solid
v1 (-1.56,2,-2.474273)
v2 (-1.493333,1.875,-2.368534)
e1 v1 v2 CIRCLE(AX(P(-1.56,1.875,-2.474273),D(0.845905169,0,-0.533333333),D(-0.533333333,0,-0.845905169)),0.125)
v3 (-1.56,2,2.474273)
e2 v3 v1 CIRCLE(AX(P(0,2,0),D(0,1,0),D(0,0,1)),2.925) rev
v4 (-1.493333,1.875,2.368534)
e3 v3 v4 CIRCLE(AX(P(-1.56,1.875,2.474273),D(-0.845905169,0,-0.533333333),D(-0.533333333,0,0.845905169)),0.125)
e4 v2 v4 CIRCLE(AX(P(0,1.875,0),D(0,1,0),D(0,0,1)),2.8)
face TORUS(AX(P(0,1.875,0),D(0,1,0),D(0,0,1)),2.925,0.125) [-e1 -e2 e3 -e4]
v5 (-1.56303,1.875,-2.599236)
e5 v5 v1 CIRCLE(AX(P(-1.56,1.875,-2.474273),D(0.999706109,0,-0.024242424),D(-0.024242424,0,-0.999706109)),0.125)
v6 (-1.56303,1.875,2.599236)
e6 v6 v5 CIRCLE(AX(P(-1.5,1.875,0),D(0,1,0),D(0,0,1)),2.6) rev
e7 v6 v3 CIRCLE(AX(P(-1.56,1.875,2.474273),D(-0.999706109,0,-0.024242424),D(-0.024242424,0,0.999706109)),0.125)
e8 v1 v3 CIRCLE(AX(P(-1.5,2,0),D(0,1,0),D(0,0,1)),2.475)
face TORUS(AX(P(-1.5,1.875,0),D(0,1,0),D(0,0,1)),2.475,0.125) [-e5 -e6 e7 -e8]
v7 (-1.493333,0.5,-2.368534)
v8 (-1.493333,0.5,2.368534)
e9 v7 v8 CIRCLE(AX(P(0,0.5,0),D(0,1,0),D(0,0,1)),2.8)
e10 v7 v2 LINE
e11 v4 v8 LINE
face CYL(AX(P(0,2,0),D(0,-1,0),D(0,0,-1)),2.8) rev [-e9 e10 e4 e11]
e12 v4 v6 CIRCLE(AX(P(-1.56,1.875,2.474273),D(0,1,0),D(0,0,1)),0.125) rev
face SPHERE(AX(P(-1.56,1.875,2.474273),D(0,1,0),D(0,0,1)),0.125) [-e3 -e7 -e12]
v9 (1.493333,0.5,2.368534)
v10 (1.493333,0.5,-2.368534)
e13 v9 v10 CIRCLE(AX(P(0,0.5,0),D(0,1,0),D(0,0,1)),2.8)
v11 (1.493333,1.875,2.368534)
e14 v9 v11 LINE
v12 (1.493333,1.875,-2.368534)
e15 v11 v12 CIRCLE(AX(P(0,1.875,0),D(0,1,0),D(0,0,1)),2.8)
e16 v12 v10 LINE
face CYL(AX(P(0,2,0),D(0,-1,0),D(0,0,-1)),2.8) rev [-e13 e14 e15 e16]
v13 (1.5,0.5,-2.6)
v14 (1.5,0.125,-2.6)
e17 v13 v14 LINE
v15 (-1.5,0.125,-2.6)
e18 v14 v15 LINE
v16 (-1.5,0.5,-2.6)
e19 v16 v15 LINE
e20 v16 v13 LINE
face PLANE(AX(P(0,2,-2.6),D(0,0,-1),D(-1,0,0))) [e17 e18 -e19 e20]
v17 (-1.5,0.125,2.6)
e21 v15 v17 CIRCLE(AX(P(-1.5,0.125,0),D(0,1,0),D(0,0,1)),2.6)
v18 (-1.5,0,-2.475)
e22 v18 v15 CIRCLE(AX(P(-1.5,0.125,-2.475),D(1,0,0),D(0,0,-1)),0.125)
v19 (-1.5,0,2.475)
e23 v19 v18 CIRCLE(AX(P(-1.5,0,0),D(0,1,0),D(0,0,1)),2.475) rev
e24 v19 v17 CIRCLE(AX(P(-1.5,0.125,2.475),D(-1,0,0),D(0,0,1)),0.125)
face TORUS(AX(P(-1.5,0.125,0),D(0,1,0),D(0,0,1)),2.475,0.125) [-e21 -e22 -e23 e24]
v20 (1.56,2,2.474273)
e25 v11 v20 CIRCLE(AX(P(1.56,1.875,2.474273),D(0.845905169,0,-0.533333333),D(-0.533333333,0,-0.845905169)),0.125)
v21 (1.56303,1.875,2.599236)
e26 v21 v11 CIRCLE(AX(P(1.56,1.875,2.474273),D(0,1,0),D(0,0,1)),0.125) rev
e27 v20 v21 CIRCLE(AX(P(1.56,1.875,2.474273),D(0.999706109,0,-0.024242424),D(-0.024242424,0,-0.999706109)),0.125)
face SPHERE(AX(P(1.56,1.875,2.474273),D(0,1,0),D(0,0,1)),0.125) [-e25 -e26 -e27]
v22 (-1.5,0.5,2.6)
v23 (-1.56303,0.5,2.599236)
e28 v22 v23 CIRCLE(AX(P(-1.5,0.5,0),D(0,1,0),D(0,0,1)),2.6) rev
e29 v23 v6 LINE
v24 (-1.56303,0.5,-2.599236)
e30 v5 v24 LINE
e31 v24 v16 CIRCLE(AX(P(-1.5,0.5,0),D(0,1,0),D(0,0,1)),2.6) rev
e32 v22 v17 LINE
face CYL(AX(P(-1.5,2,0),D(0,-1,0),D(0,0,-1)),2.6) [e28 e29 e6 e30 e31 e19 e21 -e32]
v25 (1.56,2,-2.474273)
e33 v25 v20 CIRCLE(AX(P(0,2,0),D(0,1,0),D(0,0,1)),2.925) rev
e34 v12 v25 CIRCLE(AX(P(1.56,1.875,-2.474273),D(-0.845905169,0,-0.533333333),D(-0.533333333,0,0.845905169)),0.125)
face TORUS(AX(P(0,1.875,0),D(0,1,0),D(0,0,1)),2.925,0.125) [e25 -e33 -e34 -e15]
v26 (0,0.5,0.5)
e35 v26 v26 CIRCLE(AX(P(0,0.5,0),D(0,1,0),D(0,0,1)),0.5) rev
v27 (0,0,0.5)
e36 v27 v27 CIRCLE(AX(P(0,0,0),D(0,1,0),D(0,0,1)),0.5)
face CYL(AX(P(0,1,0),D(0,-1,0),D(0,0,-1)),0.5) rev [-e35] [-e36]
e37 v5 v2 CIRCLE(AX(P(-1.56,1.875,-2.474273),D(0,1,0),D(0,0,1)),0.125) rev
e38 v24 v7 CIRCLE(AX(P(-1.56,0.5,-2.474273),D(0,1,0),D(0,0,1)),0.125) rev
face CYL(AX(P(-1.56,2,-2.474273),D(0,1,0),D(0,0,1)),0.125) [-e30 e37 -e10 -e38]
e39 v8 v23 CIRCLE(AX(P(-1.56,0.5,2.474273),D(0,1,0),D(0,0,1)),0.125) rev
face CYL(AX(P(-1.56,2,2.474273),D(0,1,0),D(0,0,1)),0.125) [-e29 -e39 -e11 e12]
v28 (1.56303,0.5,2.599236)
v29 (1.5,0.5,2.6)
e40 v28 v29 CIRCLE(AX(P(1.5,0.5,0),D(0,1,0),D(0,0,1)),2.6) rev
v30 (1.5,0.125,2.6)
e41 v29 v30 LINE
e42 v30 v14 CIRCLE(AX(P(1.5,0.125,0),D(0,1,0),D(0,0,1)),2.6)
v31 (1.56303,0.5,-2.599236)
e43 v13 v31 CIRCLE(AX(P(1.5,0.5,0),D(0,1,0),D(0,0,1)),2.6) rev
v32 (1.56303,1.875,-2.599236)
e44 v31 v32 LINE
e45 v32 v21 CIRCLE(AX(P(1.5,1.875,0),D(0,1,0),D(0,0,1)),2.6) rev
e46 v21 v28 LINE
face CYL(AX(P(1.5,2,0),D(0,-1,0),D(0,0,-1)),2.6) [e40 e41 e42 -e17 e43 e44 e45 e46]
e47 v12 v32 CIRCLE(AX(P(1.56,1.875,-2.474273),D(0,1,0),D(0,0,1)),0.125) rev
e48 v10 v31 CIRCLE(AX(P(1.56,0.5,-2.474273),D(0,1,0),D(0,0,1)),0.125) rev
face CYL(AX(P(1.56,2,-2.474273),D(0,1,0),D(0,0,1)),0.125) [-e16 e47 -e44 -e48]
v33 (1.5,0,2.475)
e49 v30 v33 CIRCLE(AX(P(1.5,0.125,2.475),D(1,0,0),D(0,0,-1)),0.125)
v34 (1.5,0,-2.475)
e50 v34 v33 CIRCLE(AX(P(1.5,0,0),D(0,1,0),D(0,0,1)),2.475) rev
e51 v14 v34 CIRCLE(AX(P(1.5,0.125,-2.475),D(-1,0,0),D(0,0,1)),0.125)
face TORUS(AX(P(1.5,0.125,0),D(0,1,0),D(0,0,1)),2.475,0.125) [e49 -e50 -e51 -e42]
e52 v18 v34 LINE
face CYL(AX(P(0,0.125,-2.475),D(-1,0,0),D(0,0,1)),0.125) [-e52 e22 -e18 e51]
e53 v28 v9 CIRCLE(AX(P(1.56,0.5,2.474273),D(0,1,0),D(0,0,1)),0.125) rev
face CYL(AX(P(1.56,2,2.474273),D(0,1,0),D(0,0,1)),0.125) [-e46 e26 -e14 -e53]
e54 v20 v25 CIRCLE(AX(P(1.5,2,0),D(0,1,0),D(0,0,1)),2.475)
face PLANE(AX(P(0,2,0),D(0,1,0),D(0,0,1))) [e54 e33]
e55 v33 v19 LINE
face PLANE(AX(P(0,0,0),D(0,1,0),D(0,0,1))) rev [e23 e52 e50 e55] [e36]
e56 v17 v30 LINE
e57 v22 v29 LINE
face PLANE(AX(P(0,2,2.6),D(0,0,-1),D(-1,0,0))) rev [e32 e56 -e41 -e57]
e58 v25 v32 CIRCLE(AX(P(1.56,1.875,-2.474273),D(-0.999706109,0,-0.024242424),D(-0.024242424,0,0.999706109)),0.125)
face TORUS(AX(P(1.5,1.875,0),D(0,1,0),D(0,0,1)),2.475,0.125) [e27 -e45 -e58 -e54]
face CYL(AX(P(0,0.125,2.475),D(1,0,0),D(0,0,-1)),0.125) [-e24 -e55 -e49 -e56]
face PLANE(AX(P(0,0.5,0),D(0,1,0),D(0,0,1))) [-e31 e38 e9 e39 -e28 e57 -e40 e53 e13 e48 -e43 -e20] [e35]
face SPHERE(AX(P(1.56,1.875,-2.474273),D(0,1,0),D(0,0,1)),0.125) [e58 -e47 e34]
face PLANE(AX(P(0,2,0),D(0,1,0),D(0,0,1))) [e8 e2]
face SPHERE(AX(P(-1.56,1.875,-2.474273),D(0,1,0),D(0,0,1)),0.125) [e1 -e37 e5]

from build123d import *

# Parameters (mm, degrees)
BOSS_EXTRUDE1_DEPTH   = 2
BOSS_EXTRUDE1_2_DEPTH = 2
BOSS_EXTRUDE2_DEPTH   = 0.5
HOLE2_OUTLINE_R       = 0.5
HOLE2_DEPTH           = 0.5
FILLET2_R             = 0.125
FILLET3_R             = 0.125


# Read off the part's stored shape, not the designer's step: Hole2
with BuildPart() as part:
    # Sketch1 → Boss-Extrude1 (new body)
    with BuildSketch(Plane(origin=(0, 0, 0), x_dir=(1, 0, 0), z_dir=(0, 1, 0))):
        with BuildLine():
            Line((-1.0392304845412224, 2.6), (-1.5, 2.6))
            ThreePointArc((-1.5, 2.6), (-4.1, -1.7e-16), (-1.4999999999999993, -2.6))
            Line((-1.5, -2.6), (-1.039230484541227, -2.6))
            ThreePointArc((-1.0392304845412341, -2.6000000000000365), (-2.8, 2.83e-15), (-1.0392304845412292, 2.6000000000000387))
        make_face()
    extrude(amount=BOSS_EXTRUDE1_DEPTH)



with BuildPart() as body_2:
    # Sketch1 → Boss-Extrude1 2 (new body)
    with BuildSketch(Plane(origin=(0, 0, 0), x_dir=(1, 0, 0), z_dir=(0, 1, 0))):
        with BuildLine():
            Line((1.4999999999999991, 2.6000000000000005), (1.039230484541188, 2.6000000000000005))
            ThreePointArc((1.0392304845411973, 2.6000000000000516), (2.8000000000000003, 3.11e-15), (1.039230484541203, -2.6000000000000494))
            Line((1.0392304845411937, -2.5999999999999996), (1.5000000000000009, -2.5999999999999996))
            ThreePointArc((1.5000000000000009, -2.5999999999999996), (4.1, 1.73e-15), (1.4999999999999984, 2.6000000000000005))
        make_face()
    extrude(amount=BOSS_EXTRUDE1_2_DEPTH)


with BuildPart() as part_1:
    add(part.part)

    add(body_2.part)  # Boss-Extrude2 merges body 2
    # Sketch1<3> → Boss-Extrude2 (add)
    with BuildSketch(Plane(origin=(0, 0, 0), x_dir=(1, 0, 0), z_dir=(0, 1, 0))):
        with BuildLine():
            Line((1.0392304845411884, 2.6000000000000005), (-1.0392304845412224, 2.6))
            ThreePointArc((-1.0392304845412292, 2.6000000000000387), (-2.8, 2.83e-15), (-1.0392304845412341, -2.6000000000000365))
            Line((-1.039230484541227, -2.6), (1.0392304845411937, -2.5999999999999996))
            ThreePointArc((1.039230484541203, -2.600000000000049), (2.3183879481997147, -1.5700564708450193), (2.8, -6.9e-16))
            ThreePointArc((2.8, 0), (2.318387948199713, 1.5700564708450213), (1.0392304845411973, 2.6000000000000516))
        make_face()
    extrude(amount=BOSS_EXTRUDE2_DEPTH)

    # Hole2 outline → Hole2 (cut)
    with BuildSketch(Plane(origin=(0, 0, 0), x_dir=(1, 0, 0), z_dir=(0, 1, 0))):
        Circle(HOLE2_OUTLINE_R)
    extrude(amount=HOLE2_DEPTH, mode=Mode.SUBTRACT)

    # Fillet2
    # the kernel refuses this fillet: 0.125 mm, written as the material it takes off along each edge
    with BuildSketch(Plane(origin=(1.4999999999999987, 0, -2.6000000000000005), x_dir=(0, 1, 3.55e-15), z_dir=(-1, 0, 1.5e-16))) as fillet2_piece_1:
        with BuildLine():
            CenterArc((FILLET2_R, -FILLET2_R), FILLET2_R, 90.00000000000021, 89.99999999999979)
            Line((4.3e-16, -FILLET2_R), (0, 0))
            Line((0, 0), (FILLET2_R, 0))
        make_face()
    extrude(amount=2.9999999999999987, mode=Mode.SUBTRACT)
    with BuildSketch(Plane(origin=(1.4999999999999996, 0, -3.3e-16), x_dir=(5.1e-16, 0, 1), z_dir=(-1, 0, 5.1e-16))) as fillet2_piece_2:
        with BuildLine():
            CenterArc((2.6 - FILLET2_R, FILLET2_R), FILLET2_R, 270, 90)
            Line((2.6, FILLET2_R), (2.6, 0))
            Line((2.6, 0), (2.6 - FILLET2_R, 0))
        make_face()
    revolve(axis=Axis((1.4999999999999996, 0, -3.3e-16), (0, 1, 0)), revolution_arc=180, mode=Mode.SUBTRACT)
    with BuildSketch(Plane(origin=(1.5000000000000009, 0, 2.5999999999999996), x_dir=(-1.5e-16, 0, -1), z_dir=(-1, 0, 1.5e-16))) as fillet2_piece_3:
        with BuildLine():
            CenterArc((FILLET2_R, -FILLET2_R), FILLET2_R, 90, 90)
            Line((0, -FILLET2_R), (0, 0))
            Line((0, 0), (FILLET2_R, 0))
        make_face()
    extrude(amount=3.0000000000000004, mode=Mode.SUBTRACT)
    with BuildSketch(Plane(origin=(-1.0392304845412306, 0.5, 2.6000000000000183), x_dir=(-0.8909362232588717, 0, -0.4541284466813525), z_dir=(0, 1, 0))) as fillet2_piece_4:
        with BuildLine():
            CenterArc((0.5210688048998693, 0.1244811743822189), FILLET2_R, 115.6197462863135, 149.1581720450634)
            Line((0.4670192388207316, 0.23719161935808136), (0.46161428221281786, 0.24846266385566762))
            ThreePointArc((0.46161428221281786, 0.24846266385566762), (0.404839646312147, 0.2203852471241299), (-0.00567660558351699, 0.01113670279073605))
            Line((-0.00567660558351699, 0.01113670279073605), (0.00113770481419139, -0.01244811743822212))
            ThreePointArc((0.00113770481419139, -0.01244811743822212), (0.254845878378973, -0.00087830616170155), (0.5085540519437544, -0.0124481174382219))
            Line((0.5085540519437544, -0.0124481174382219), (0.5096917567579465, -1e-17))
        make_face()
    extrude(amount=2.809500939581575, mode=Mode.SUBTRACT)
    with BuildSketch(Plane(origin=(1.0392304845411986, 0.5, 2.600000000000024), x_dir=(0.8909362232588801, 0, -0.45412844668133606), z_dir=(0, 1, 0))) as fillet2_piece_5:
        with BuildLine():
            CenterArc((0.5210688048999061, -0.12448117438221841), FILLET2_R, 95.22208166862436, 149.158172045063)
            Line((0.4670192388207701, -0.23719161935808164), (0.46161428221285655, -0.248462663855668))
            ThreePointArc((0.46161428221285655, -0.248462663855668), (0.4048396463121838, -0.22038524712413216), (-0.00567660558351678, -0.01113670279073616))
            Line((-0.00567660558351678, -0.01113670279073616), (0.00113770481419136, 0.01244811743822204))
            ThreePointArc((0.00113770481419136, 0.01244811743822204), (0.2548458783789898, 0.00087830616169669), (0.5085540519437883, 0.0124481174382219))
            Line((0.5085540519437883, 0.0124481174382219), (0.5096917567579807, 2e-17))
        make_face()
    extrude(amount=2.8095009395816612, mode=Mode.SUBTRACT)
    with BuildSketch(Plane(origin=(1.0392304845411924, 0.5, -2.600000000000026), x_dir=(0.9999989359619427, 0, 0.001458792302720678), z_dir=(0, 1, 0))) as fillet2_piece_6:
        with BuildLine():
            CenterArc((0.5209523714738641, -0.12496755127300935), FILLET2_R, 88.69445799122111, 149.1581720450468)
            Line((0.45444002573679215, -0.23080283775418345), (0.447788791163085, -0.24138636640230085))
            ThreePointArc((0.447788791163085, -0.24138636640230085), (0.22682229100640774, -0.11618451467849848), (-0.00462248445880959, -0.01161389845952106))
            Line((-0.00462248445880959, -0.01161389845952106), (-1.823490378401e-05, 0.01249998669952446))
            ThreePointArc((-1.823490378401e-05, 0.01249998669952446), (0.46075079027872196, 0.01317215372197879), (0.5240851762685466, 0.01249675512730089))
            Line((0.5240851762685466, 0.01249675512730089), (0.5238003758326663, 0))
        make_face()
    extrude(amount=2.8095009395816657, mode=Mode.SUBTRACT)
    with BuildSketch(Plane(origin=(-1.4999999999999996, 0, 0), x_dir=(-1.7e-16, 0, -1), z_dir=(1, 0, -1.7e-16))) as fillet2_piece_7:
        with BuildLine():
            CenterArc((2.6 - FILLET2_R, FILLET2_R), FILLET2_R, 270, 90)
            Line((2.6 - FILLET2_R, -1e-17), (2.6, 0))
            Line((2.6, 0), (2.6, FILLET2_R))
        make_face()
    revolve(axis=Axis((-1.4999999999999996, 0, 0), (0, 1, 0)), revolution_arc=180, mode=Mode.SUBTRACT)
    with BuildSketch(Plane(origin=(-1.0392304845412257, 0.5, -2.600000000000019), x_dir=(-0.9999989359619427, 0, 0.0014587923027088937), z_dir=(0, 1, 0))) as fillet2_piece_8:
        with BuildLine():
            CenterArc((0.5209523714738317, 0.1249675512730093), FILLET2_R, 122.14736996373313, 149.15817204504657)
            Line((0.4544400257367579, 0.23080283775418217), (0.44778879116305065, 0.24138636640229952))
            ThreePointArc((0.44778879116305065, 0.24138636640229952), (0.2268222910063884, 0.11618451467850208), (-0.00462248445880995, 0.01161389845952101))
            Line((-0.00462248445880995, 0.01161389845952101), (-1.823490378386e-05, -0.01249998669952446))
            ThreePointArc((-1.823490378386e-05, -0.01249998669952446), (0.46075079027869037, -0.01317215372197953), (0.524085176268516, -0.01249675512730089))
            Line((0.524085176268516, -0.01249675512730089), (0.5238003758326356, 0))
        make_face()
    extrude(amount=2.809500939581589, mode=Mode.SUBTRACT)

    # Fillet3
    fillet3_edges = [part_1.edges().sort_by_distance(p)[0] for p in [
        (4.1, 2, 5.853e-14),
        (-2.799999999999999, 2, -1.78e-15),
        (-4.1, 2, 6.033e-14),
        (-1.440341394717322, 2, -2.510422560661599),
        (-1.4403413947172043, 2, 2.5104225606616026),
        (2.8, 2, -2.2e-16),
        (1.4403413947173214, 2, -2.5104225606615973),
        (1.4403413947172052, 2, 2.510422560661605),
    ]]
    fillet(fillet3_edges, radius=FILLET3_R)


solid = part_1.part
